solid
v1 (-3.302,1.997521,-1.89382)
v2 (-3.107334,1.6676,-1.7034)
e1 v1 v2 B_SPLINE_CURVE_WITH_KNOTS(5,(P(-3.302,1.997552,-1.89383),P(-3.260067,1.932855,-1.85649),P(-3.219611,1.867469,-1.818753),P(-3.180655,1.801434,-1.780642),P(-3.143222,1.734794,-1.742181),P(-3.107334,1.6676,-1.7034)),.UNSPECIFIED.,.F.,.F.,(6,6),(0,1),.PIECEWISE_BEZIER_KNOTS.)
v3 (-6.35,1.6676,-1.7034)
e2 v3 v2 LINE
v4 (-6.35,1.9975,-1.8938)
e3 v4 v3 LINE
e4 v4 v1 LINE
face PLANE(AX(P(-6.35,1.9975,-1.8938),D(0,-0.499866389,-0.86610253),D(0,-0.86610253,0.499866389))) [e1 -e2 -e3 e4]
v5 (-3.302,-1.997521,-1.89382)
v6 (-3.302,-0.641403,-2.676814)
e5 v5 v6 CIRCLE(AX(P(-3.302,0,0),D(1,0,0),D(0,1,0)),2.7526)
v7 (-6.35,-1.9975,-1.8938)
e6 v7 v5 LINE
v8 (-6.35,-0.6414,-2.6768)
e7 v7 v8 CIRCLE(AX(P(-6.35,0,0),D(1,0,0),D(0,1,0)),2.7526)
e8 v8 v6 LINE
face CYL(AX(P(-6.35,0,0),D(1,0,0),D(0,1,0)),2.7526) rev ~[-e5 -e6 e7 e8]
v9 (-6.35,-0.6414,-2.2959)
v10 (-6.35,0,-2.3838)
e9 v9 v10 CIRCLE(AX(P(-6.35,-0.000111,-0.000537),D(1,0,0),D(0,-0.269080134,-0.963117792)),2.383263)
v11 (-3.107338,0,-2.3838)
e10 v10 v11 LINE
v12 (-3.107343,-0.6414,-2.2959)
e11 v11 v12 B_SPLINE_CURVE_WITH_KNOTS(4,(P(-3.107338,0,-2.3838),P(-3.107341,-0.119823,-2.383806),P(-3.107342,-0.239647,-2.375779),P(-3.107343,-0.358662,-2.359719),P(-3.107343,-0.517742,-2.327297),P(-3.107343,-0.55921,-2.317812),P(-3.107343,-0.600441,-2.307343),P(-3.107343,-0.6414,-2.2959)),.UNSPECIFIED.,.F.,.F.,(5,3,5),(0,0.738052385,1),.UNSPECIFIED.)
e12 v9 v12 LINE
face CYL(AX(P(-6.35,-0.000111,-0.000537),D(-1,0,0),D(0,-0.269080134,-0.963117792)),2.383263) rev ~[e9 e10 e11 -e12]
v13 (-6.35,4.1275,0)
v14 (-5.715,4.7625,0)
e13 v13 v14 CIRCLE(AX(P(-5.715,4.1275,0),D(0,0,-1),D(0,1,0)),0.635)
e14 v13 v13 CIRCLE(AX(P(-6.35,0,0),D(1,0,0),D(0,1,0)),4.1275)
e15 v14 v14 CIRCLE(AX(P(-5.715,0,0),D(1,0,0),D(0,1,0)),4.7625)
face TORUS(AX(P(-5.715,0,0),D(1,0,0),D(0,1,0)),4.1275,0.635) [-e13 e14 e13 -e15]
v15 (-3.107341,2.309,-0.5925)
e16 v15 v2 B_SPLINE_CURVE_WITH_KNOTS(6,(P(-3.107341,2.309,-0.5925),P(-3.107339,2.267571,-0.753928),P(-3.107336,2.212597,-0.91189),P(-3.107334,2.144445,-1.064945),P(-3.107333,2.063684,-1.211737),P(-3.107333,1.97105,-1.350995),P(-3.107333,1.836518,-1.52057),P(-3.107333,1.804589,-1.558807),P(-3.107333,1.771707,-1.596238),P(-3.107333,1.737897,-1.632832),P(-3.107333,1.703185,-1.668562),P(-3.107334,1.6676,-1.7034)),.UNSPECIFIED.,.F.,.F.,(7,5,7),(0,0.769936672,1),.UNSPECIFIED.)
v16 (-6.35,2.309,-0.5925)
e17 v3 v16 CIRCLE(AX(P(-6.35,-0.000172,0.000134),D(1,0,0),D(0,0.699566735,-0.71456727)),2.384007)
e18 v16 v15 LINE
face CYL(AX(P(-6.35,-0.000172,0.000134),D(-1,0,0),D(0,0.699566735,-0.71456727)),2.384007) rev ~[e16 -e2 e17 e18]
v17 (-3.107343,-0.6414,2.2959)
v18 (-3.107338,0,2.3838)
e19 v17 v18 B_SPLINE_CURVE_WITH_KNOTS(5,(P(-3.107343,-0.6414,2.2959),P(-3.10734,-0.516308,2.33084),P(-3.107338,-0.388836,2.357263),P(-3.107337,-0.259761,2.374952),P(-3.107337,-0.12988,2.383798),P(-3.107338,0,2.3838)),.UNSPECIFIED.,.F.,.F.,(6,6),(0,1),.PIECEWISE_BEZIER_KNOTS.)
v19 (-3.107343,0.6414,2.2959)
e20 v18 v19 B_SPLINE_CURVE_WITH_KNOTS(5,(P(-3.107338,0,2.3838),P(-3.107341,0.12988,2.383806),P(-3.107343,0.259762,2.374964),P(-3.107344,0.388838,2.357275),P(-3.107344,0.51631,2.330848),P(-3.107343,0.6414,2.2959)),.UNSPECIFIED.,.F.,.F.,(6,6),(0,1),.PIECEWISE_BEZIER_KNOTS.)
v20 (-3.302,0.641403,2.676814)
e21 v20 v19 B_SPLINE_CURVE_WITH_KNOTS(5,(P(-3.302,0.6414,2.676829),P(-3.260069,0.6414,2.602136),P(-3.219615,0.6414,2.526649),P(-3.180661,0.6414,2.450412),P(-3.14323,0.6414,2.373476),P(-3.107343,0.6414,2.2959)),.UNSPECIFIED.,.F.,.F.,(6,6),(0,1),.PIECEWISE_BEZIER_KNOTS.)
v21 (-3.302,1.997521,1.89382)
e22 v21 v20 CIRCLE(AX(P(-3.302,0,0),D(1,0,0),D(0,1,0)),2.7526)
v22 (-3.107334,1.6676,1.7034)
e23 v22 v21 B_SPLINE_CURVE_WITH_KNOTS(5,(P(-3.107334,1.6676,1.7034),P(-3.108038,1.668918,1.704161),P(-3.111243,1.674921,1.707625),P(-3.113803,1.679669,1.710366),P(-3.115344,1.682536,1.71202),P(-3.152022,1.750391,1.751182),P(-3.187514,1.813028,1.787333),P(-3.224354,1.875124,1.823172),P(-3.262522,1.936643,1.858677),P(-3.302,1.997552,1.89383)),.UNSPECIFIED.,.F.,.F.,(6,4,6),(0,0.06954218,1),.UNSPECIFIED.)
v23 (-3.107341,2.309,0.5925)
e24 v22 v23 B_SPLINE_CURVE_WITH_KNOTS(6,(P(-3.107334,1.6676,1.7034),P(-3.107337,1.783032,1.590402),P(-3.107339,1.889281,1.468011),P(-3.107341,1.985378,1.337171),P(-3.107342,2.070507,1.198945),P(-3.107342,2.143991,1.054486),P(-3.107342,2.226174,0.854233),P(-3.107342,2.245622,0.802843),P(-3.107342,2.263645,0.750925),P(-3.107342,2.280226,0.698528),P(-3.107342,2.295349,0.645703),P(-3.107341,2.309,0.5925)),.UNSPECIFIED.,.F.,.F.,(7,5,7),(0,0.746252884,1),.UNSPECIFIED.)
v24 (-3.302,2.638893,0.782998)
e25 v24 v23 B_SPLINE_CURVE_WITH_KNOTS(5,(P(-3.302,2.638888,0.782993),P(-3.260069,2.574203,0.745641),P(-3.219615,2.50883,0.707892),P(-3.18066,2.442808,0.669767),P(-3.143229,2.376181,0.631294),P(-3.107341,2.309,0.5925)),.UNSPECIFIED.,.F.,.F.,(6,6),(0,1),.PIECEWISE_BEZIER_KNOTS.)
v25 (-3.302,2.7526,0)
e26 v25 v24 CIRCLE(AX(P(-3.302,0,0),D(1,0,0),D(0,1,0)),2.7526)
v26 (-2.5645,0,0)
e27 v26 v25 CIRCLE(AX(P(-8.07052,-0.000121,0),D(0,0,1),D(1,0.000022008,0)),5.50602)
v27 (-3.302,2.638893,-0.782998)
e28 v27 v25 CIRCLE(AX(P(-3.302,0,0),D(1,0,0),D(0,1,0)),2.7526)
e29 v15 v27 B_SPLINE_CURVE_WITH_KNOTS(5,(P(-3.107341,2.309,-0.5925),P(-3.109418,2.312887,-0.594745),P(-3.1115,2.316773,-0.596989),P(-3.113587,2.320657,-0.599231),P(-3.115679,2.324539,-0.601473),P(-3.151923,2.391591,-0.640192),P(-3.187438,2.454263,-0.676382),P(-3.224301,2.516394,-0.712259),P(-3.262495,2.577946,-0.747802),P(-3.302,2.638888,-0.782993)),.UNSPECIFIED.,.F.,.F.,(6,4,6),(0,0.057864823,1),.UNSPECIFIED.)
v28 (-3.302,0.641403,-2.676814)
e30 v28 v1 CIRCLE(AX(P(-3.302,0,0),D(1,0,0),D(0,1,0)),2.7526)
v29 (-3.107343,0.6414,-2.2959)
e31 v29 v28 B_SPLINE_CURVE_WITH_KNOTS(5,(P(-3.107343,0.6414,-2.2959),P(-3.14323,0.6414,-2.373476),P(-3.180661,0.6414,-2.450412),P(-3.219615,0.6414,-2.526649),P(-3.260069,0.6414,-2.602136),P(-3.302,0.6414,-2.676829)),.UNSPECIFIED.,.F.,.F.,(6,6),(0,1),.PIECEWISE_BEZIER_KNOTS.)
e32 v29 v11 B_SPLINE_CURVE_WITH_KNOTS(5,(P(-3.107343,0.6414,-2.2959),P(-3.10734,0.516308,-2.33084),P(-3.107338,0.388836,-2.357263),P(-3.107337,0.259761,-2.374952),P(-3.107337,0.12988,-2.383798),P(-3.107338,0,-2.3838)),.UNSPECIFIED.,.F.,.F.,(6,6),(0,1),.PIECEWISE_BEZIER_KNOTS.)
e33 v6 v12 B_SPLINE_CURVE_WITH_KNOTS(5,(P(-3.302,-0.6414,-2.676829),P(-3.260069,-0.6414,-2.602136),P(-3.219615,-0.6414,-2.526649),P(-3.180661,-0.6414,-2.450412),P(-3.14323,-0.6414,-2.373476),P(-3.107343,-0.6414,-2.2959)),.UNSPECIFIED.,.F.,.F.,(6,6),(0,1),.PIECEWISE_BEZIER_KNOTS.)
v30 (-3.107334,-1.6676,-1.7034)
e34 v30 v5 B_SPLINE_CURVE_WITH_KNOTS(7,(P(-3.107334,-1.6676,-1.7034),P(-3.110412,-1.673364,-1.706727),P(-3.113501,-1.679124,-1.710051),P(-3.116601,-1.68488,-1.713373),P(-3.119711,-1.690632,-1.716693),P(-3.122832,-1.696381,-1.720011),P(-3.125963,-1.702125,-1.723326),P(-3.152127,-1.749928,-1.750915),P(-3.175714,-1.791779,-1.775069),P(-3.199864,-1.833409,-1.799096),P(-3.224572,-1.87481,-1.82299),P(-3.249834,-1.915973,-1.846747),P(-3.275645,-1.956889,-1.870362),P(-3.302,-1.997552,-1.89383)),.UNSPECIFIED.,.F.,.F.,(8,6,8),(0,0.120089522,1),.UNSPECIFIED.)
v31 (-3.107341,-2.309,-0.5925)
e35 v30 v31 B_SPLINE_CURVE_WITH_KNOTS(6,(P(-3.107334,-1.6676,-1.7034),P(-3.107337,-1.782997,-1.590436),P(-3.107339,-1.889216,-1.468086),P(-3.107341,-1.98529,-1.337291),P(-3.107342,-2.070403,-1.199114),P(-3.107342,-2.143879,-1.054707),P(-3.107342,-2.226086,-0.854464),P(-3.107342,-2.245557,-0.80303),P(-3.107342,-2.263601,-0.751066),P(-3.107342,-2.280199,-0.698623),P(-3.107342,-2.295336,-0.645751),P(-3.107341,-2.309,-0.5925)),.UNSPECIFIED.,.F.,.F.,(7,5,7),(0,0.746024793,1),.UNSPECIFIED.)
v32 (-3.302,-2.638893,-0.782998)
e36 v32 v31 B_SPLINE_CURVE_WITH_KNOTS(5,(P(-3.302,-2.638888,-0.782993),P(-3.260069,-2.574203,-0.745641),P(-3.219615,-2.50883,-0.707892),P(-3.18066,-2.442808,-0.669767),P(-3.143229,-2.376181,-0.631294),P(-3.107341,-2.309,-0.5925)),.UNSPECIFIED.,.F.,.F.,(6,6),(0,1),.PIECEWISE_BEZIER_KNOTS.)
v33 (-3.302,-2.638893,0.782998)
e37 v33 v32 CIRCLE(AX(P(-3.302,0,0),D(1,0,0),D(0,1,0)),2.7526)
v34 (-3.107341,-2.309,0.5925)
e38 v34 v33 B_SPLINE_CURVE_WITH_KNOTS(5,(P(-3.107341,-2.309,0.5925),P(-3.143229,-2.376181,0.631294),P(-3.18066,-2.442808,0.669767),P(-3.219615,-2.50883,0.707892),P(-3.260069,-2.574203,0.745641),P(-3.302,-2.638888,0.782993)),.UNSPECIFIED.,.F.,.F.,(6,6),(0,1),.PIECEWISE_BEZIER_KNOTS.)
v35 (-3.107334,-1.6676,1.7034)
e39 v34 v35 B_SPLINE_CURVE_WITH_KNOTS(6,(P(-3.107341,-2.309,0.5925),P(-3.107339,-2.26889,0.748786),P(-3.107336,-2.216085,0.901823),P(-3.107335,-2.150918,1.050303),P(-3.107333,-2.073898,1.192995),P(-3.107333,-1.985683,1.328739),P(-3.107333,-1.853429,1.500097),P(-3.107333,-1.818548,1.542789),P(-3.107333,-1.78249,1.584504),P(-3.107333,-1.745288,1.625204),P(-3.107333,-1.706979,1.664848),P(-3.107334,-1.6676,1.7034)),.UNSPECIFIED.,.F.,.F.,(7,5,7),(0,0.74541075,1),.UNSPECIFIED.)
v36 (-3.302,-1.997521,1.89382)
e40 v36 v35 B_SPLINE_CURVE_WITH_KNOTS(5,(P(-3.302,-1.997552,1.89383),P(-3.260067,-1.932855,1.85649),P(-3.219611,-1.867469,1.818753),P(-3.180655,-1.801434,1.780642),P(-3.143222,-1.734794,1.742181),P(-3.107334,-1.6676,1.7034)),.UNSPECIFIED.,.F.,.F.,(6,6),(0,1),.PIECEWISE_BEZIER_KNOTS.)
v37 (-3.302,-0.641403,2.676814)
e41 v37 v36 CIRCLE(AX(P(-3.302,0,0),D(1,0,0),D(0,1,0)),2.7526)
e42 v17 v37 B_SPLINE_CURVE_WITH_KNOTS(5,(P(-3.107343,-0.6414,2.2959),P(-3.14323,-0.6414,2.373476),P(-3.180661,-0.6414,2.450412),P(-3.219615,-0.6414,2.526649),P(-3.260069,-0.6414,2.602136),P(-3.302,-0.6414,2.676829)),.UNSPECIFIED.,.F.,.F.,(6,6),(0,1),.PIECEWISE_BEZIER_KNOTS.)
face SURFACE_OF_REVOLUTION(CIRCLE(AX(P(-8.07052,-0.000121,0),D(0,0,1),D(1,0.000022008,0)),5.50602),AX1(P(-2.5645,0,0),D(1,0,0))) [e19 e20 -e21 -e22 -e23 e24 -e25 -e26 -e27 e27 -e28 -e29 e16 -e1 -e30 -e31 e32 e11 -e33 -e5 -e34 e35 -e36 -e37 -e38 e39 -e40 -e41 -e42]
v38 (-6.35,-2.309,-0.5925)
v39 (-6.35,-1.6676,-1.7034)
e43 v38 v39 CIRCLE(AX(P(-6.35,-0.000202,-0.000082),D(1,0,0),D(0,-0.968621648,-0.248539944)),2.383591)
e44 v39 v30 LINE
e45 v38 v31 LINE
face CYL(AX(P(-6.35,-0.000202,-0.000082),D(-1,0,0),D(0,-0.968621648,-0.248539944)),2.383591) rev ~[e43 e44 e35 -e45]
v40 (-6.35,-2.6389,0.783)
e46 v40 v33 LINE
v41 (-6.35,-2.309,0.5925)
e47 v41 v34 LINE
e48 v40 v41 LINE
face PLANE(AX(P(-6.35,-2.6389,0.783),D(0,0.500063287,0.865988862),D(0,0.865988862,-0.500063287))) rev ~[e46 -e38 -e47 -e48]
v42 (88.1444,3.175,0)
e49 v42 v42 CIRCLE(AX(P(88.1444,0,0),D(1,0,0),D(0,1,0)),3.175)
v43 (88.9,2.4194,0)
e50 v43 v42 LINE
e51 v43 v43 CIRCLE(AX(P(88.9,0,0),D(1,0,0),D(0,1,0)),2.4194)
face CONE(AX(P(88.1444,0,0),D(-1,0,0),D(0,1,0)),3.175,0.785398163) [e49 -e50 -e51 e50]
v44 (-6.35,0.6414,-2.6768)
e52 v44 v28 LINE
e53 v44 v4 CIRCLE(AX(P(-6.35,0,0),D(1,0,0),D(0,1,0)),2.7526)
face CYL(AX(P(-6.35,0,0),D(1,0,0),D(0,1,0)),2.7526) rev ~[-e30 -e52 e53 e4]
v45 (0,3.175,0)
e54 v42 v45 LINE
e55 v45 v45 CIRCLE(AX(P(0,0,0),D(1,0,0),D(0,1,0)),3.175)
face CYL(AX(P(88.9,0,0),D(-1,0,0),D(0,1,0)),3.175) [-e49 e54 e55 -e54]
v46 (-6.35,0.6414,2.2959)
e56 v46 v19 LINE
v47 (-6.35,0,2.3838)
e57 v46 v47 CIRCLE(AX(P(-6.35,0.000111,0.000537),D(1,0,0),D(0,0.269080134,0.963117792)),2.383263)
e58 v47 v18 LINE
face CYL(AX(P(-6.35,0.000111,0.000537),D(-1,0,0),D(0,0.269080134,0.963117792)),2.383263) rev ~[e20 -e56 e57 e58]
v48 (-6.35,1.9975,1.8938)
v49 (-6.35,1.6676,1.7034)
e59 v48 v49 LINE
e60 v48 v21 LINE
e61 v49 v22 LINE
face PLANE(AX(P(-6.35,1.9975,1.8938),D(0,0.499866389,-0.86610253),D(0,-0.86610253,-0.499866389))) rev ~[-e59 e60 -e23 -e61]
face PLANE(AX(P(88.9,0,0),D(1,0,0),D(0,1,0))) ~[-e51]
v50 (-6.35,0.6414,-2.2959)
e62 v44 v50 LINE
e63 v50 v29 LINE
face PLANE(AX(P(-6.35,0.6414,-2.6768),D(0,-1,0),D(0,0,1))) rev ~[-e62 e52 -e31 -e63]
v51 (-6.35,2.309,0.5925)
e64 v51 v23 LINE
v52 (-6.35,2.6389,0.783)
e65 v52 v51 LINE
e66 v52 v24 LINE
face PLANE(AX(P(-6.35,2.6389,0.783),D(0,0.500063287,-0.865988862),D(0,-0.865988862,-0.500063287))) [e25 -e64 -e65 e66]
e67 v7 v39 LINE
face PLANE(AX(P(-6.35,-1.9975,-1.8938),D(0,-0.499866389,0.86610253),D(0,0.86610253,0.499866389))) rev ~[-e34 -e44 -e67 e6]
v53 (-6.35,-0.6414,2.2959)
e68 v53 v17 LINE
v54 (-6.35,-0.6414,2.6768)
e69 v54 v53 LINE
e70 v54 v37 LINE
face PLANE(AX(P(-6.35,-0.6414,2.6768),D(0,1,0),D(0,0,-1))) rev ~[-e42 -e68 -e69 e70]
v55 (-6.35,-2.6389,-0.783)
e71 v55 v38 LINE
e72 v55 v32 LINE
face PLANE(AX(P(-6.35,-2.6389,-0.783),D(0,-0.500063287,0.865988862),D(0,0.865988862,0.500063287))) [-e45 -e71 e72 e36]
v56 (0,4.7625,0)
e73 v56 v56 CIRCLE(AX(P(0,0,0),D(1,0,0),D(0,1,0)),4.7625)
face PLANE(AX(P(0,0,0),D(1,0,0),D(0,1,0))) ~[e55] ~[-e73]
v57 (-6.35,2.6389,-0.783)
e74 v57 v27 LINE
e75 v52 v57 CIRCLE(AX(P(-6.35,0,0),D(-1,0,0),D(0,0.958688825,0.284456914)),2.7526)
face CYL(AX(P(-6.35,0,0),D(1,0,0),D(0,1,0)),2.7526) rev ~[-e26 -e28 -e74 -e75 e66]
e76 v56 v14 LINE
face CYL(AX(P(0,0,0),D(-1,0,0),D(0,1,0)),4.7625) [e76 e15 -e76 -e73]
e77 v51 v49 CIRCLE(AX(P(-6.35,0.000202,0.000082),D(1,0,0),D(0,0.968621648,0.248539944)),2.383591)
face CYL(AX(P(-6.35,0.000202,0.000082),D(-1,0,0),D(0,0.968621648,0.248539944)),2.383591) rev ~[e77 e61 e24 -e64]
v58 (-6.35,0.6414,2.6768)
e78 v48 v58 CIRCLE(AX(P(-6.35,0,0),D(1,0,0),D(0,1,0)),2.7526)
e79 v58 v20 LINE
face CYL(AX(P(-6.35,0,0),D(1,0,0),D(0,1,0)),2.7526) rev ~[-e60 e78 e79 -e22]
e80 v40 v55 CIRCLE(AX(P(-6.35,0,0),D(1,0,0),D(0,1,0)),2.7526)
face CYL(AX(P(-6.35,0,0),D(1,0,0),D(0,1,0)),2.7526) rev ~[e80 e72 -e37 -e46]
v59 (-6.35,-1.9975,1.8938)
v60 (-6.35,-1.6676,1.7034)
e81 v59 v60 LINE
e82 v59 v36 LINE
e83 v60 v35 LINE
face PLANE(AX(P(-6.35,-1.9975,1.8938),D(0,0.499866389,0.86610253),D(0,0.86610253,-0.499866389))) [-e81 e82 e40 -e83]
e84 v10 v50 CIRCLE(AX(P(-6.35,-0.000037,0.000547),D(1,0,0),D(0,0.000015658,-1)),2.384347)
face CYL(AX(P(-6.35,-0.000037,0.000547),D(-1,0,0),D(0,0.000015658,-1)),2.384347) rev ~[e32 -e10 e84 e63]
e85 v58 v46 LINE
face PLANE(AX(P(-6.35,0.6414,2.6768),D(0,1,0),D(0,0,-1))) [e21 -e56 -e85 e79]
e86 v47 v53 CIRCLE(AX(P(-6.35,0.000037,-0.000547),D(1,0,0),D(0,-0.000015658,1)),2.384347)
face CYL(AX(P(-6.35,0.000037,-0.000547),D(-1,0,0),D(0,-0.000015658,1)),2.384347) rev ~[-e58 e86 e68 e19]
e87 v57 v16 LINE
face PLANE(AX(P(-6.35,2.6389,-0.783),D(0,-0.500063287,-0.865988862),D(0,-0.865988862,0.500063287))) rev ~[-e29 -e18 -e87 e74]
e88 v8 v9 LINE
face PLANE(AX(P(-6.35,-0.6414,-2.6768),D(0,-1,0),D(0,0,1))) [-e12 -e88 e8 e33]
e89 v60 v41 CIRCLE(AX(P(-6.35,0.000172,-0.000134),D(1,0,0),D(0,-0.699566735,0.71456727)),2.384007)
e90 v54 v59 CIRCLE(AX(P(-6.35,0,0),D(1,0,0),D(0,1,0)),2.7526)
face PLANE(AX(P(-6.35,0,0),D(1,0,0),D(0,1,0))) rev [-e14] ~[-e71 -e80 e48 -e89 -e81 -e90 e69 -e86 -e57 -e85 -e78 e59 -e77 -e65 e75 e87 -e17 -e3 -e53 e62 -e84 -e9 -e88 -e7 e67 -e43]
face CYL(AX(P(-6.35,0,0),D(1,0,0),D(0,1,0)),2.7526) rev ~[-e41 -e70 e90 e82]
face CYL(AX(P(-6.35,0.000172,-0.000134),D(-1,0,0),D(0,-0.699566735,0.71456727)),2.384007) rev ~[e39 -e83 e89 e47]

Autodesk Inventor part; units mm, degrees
ref_plane "YZ Plane" through (0, 0, 0) normal (1, 0, 0) x (0, 1, 0)
sketch "Sketch1" plane through (0, 0, 0) normal (0, 0, 1) x (1, 0, 0)
  line L0 (-6.35, 0) -> (88.9, 0)
  line L1 (88.9, 0) -> (88.9, 3.175)
  line L2 (88.9, 3.175) -> (0, 3.175)
  line L3 (0, 3.175) -> (0, 4.7625)
  line L4 (-27.4635, 0) -> (108.2939, 0) projected
  line L5 (0, -0.9525) -> (0, 5.715) projected
  line L6 (0, 4.7625) -> (-6.35, 4.7625)
  line L7 (-6.35, 0) -> (-6.35, 4.7625)
  arc A0 (-2.5645, 0) -> (-3.302, 2.7526) centre (-8.0696, 0) ccw
  line L8 (-6.35, 2.7526) -> (-3.302, 2.7526)
  line L9 (12.7, 3.175) -> (0, 3.175) construction
  dimension "d0" = 88.9
  dimension "d1" = 6.35
  dimension "d2" = 6.35
  dimension "d5" = 9.525
  dimension "d13" = 5.5051
  dimension "d14" = 5.5051
  dimension "d15" = 3.048
revolve "Body" add sketch "Sketch1" angle 360 about axis through (-6.35, 0, 0) along (1, 0, 0) contours A0 L8 L7 L6 L3 L5 L0 | L5 L2 L1 L0
ref_plane "IDS_WORKPLANE{1}" through (-6.35, 0, 0) normal (1, 0, 0) x (0, 0, -1)
sketch "Sketch2" plane through (-6.35, 0, 0) normal (1, 0, 0) x (0, 0, -1)
  line L0 (0, -6.6675) -> (0, 6.6675) projected
  line L1 (6.6675, 0) -> (-6.6675, 0) projected
  circle A0 centre (0, 0) radius 4.7625 projected
  line L2 (2.6768, 0.6414) -> (2.2959, 0.6414)
  line L3 (0, 0) -> (2.6768, 0.6414) construction
  line L4 (0, 0) -> (4.0727, 3.8613) construction
  line L5 (0, 0) -> (0.783, 2.6389) construction
  line L6 (0, 0) -> (1.3763, 2.3838) construction
  line L7 (0.783, 2.6389) -> (0.5925, 2.309)
  line L8 (1.8938, 1.9975) -> (1.7034, 1.6676)
  line L9 (0, 0) -> (1.8938, 1.9975) construction
  arc A1 (2.3838, 0) -> (2.2959, 0.6414) centre (0, 0) ccw
  arc A2 (1.7034, 1.6676) -> (0.5925, 2.309) centre (0, 0) ccw
  arc A3 (2.7526, 0) -> (2.6768, 0.6414) centre (0, 0) ccw
  arc A4 (1.8938, 1.9975) -> (0.783, 2.6389) centre (0, 0) ccw
  arc A5 (2.6768, 0.6414) -> (1.6232, 2.223) centre (0, 0) ccw construction
  arc A6 (2.2959, 0.6414) -> (1.7034, 1.6676) centre (0, 0) ccw construction
  line L10 (2.6768, -0.6414) -> (2.2959, -0.6414)
  line L11 (0.783, -2.6389) -> (0.5925, -2.309)
  line L12 (1.8938, -1.9975) -> (1.7034, -1.6676)
  arc A7 (2.2959, -0.6414) -> (2.3838, 0) centre (0, 0) ccw
  arc A8 (0.5925, -2.309) -> (1.7034, -1.6676) centre (0, 0) ccw
  arc A9 (2.6768, -0.6414) -> (2.7526, 0) centre (0, 0) ccw
  arc A10 (0.783, -2.6389) -> (1.8938, -1.9975) centre (0, 0) ccw
  line L13 (-2.6768, 0.6414) -> (-2.2959, 0.6414)
  line L14 (-0.783, 2.6389) -> (-0.5925, 2.309)
  line L15 (-1.8938, 1.9975) -> (-1.7034, 1.6676)
  arc A11 (-2.2959, 0.6414) -> (-2.3838, 0) centre (0, 0) ccw
  arc A12 (-0.5925, 2.309) -> (-1.7034, 1.6676) centre (0, 0) ccw
  arc A13 (-2.6768, 0.6414) -> (-2.7526, 0) centre (0, 0) ccw
  arc A14 (-0.783, 2.6389) -> (-1.8938, 1.9975) centre (0, 0) ccw
  line L16 (-0.783, -2.6389) -> (-0.5925, -2.309)
  arc A15 (-1.7034, -1.6676) -> (-0.5925, -2.309) centre (0, 0) ccw
  line L17 (-1.8938, -1.9975) -> (-1.7034, -1.6676)
  arc A16 (-1.8938, -1.9975) -> (-0.783, -2.6389) centre (0, 0) ccw
  arc A17 (-2.3838, 0) -> (-2.2959, -0.6414) centre (0, 0) ccw
  line L18 (-2.6768, -0.6414) -> (-2.2959, -0.6414)
  arc A18 (-2.7526, 0) -> (-2.6768, -0.6414) centre (0, 0) ccw
  point P0 (1.3763, -2.3838)
  point P1 (-1.3763, 2.3838)
  point P2 (-1.3763, -2.3838)
  dimension "d19" = 0.6413
  dimension "d20" = 1.2827
  dimension "d21" = 33.052
  dimension "d22" = 5.5051
  dimension "d23" = 4.7676
extrude "Slot" add sketch "Sketch2" along normal up to next contours A1 L2 A3 L1 | L1 A9 L10 A7 | A17 L18 A18 L1 | L1 A13 L13 A11 | A4 L8 A2 L7 | L11 A8 L12 A10 | L14 A12 L15 A14 | A16 L17 A15 L16
fillet "Fillet1" radius 0.635 1 edges at (-6.35, -4.7625, 0)
thread "Thread" size "1/4-20 UNC" class "2A" standard "ANSI Unified Screw Threads" length 25.4
chamfer "Chamfer1" distance 0.7556 distance2 0.7556 1 edges at (88.9, -3.175, 0) measured on face at (88.9, 1.0276, 0.2533)
ref_plane "Work Plane2" through (-3.175, 0, 0) normal (0, 0, -1) x (1, 0, 0)
equation "\"d19\" = 0.5 * SBR"
equation "\"d20\" = SBR"
equation "\"d22\" = 1.1547 * SW"
equation "\"d23\" = SW"
equation "\"d17\" = INTI"
equation "\"d24\" = RR"
equation "\"d6\" = GEL"
equation "\"d9\" = -0.5 * SPD + 0.5 * NND"
equation "\"d10\" = GUL"
equation "\"d0\" = NLG"
equation "\"d1\" = KOH"
equation "\"d2\" = NND"
equation "\"d5\" = KOD"
equation "\"d13\" = 1.1547 * SW"
equation "\"d14\" = 1.1547 * SW"
equation "\"d15\" = INTI"
equation "\"NND\" = 6.35"
equation "\"NLG\" = 88.9"
equation "\"GEL\" = 25.4"
equation "\"KOD\" = 9.525"
equation "\"KOH\" = 6.35"
equation "\"SPD\" = GD1"
equation "\"GUL\" = 0.75565"
equation "\"SBR\" = 1.2827"
equation "\"INTI\" = 3.048"
equation "\"d11\" = -KOH"
equation "\"SW\" = 4.76758"
equation "\"d16\" = 1.1547 * SW"
equation "\"d18\" = SW"
equation "\"RR\" = 0.635"
equation "\"TOA\" = 30deg"
equation "\"GD1\" = 4.8387"
equation "\"THREADDIA\" = 6.35"
equation "\"BDM\" = NND"
equation "\"GD\" = NND"
equation "\"GAL\" = 3.175"
equation "\"E0\" = 5.55498"
properties part number "ANSI B18.3 - 1/4-20 UNC - 3.5" material "Steel, Mild"
